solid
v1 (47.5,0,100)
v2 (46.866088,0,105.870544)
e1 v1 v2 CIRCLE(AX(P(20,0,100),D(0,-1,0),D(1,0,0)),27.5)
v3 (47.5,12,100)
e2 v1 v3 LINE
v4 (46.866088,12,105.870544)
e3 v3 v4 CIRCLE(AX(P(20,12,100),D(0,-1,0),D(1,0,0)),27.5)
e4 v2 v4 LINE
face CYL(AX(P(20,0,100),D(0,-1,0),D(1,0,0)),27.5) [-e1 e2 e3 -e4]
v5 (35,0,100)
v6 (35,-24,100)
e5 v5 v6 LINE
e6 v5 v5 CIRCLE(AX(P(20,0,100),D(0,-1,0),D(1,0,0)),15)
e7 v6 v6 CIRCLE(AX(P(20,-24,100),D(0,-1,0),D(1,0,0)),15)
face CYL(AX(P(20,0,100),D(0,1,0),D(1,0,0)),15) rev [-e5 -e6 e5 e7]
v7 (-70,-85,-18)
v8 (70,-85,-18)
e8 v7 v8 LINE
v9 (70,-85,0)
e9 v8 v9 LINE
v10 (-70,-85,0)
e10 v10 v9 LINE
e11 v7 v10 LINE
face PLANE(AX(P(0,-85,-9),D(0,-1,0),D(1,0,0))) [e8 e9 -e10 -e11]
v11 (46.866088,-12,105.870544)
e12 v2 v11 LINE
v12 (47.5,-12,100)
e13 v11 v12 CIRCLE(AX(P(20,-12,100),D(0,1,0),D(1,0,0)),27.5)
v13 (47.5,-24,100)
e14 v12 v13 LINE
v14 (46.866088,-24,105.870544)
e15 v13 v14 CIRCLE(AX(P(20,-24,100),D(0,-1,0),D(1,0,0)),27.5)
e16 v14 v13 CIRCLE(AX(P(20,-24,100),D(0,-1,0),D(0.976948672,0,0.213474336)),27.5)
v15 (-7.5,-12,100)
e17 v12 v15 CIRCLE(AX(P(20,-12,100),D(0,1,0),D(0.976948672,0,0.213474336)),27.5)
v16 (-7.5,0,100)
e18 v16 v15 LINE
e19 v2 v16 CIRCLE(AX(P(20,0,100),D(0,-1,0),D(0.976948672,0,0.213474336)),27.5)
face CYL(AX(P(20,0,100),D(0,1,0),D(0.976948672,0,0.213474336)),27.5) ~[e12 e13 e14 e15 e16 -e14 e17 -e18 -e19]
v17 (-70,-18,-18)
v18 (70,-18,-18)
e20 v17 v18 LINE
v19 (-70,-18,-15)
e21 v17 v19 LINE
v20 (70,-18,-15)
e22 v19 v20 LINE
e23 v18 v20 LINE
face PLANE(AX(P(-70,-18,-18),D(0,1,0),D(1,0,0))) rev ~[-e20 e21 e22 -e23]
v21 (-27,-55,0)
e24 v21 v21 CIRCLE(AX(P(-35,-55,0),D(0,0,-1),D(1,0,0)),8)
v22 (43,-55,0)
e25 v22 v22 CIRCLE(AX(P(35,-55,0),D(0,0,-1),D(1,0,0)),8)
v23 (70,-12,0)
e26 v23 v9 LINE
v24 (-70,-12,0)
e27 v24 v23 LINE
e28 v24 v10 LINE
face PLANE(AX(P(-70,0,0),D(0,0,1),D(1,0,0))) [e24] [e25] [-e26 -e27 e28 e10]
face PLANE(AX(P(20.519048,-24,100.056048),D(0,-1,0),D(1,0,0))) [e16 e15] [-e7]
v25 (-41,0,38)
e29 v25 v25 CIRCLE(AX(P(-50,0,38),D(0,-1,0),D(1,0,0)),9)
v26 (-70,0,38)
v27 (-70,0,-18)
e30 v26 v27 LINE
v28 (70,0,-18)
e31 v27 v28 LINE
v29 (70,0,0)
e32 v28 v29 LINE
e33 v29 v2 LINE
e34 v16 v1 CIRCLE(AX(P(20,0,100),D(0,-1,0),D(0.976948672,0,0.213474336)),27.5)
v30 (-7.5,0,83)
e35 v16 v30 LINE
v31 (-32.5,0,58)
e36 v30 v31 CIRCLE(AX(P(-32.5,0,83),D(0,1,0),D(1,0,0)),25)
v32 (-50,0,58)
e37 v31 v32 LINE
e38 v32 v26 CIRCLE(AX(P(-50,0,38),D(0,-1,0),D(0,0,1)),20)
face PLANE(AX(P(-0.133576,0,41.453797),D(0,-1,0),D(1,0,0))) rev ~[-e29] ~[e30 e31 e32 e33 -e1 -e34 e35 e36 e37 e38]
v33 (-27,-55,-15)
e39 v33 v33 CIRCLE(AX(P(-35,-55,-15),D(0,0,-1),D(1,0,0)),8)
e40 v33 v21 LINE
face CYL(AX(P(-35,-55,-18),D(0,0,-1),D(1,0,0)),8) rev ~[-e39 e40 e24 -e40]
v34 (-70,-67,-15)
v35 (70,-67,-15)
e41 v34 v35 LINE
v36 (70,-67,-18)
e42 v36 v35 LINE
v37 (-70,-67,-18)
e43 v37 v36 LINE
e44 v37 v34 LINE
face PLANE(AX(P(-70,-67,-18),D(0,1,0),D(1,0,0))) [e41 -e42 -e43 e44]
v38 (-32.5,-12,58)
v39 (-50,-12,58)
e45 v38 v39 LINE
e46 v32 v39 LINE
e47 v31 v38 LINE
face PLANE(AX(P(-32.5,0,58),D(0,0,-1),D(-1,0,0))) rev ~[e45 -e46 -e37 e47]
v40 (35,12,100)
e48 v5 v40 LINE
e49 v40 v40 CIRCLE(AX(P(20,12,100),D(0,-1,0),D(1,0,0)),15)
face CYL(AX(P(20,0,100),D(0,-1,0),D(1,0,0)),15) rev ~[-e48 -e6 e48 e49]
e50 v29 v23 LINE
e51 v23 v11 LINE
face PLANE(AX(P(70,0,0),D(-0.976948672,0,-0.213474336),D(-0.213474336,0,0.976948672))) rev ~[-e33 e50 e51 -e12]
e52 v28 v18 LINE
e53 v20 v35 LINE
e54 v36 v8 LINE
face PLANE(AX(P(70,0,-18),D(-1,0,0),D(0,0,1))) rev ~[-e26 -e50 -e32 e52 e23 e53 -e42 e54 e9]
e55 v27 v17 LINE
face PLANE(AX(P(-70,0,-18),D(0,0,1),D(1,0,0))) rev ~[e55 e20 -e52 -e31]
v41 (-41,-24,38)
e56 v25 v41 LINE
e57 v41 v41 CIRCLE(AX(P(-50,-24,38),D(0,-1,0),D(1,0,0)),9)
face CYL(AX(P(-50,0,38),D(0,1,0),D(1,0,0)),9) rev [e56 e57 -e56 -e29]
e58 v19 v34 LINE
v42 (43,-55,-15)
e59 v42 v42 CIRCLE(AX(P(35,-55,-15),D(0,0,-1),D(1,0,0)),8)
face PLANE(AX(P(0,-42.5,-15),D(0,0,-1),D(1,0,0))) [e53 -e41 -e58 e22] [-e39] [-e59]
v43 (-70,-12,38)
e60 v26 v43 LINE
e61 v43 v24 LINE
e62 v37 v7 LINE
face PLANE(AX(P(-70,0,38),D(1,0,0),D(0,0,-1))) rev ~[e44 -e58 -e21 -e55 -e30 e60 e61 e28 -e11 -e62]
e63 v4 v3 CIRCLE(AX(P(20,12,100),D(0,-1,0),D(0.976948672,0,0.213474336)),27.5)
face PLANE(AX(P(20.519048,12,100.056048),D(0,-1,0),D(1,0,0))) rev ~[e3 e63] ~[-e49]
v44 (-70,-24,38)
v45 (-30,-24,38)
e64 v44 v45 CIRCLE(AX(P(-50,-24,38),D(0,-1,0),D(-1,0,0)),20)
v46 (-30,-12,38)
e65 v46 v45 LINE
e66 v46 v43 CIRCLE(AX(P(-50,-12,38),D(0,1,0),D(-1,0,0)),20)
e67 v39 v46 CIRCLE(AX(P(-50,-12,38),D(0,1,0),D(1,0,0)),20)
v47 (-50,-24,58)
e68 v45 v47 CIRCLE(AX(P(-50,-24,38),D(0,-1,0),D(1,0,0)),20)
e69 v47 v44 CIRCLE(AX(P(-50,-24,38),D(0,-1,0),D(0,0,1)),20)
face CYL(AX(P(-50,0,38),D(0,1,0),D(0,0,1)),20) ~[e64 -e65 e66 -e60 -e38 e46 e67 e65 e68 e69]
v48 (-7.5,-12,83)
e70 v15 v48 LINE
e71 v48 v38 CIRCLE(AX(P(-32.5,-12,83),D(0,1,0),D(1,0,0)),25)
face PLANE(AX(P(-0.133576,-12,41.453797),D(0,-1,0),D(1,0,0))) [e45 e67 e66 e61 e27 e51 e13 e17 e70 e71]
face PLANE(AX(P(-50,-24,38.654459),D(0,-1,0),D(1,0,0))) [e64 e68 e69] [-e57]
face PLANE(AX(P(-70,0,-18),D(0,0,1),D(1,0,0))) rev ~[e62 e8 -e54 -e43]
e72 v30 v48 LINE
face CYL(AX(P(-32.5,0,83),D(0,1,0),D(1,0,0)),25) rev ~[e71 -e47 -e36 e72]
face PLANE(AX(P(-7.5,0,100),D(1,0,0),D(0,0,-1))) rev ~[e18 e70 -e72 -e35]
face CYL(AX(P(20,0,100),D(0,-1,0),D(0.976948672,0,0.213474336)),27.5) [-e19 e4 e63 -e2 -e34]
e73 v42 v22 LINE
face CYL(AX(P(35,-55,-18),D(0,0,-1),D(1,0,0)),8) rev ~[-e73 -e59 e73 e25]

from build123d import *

# Parameters (mm, degrees)
F0_W          = 140
F0_H          = 18
F1_DEPTH      = 85
F0_R          = 9
F0_R_2        = 15
F2_DEPTH      = 12
F3_DEPTH      = 24
F4_DEPTH      = 24
F4_DEPTH_BACK = 12
F5_W          = 140
F5_H          = 49
F5_R          = 8
F6_DEPTH      = 3
F7_DEPTH      = 25


# Not quite as in the source:
# - after a boolean that leaves OpenCascade's solid faulty, fix() repairs it


with BuildPart() as f1:
    # F0 (on Front) → F1 (new body)
    with BuildSketch(Plane.XZ):
        with Locations((0, -9)):
            Rectangle(F0_W, F0_H)
    extrude(amount=F1_DEPTH)

    # F0 (on Front) → F2 (join)
    with BuildSketch(Plane.XZ):
        with BuildLine():
            Line((-70, 38), (-70, 0))
            Line((-70, 0), (70, 0))
            Line((70, 0), (46.8660884819, 105.8705442409))
            ThreePointArc((46.8660884819, 105.8705442409), (47.3410628291, 102.9523352409), (47.5, 100))
            ThreePointArc((47.5, 100), (20, 72.5), (-7.5, 100))
            Line((-7.5, 100), (-7.5, 83))
            ThreePointArc((-7.5, 83), (-14.8223304703, 65.3223304703), (-32.5, 58))
            Line((-32.5, 58), (-50, 58))
            ThreePointArc((-50, 58), (-35.8578643763, 52.1421356237), (-30, 38))
            ThreePointArc((-30, 38), (-50, 18), (-70, 38))
        make_face()
        with BuildLine():
            ThreePointArc((-50, 58), (-64.1421356237, 52.1421356237), (-70, 38))
            ThreePointArc((-70, 38), (-50, 18), (-30, 38))
            ThreePointArc((-30, 38), (-35.8578643763, 52.1421356237), (-50, 58))
        make_face()
        with Locations((-50, 38)):
            Circle(F0_R, mode=Mode.SUBTRACT)
        with BuildLine():
            ThreePointArc((47.5, 100), (47.3410628291, 102.9523352409), (46.8660884819, 105.8705442409))
            ThreePointArc((46.8660884819, 105.8705442409), (17.0476647591, 127.3410628291), (-7.5, 100))
            ThreePointArc((-7.5, 100), (20, 72.5), (47.5, 100))
        make_face()
        with Locations((20, 100)):
            Circle(F0_R_2, mode=Mode.SUBTRACT)
    extrude(amount=F2_DEPTH)

    # F0 (on Front) → F3 (join)
    with BuildSketch(Plane.XZ):
        with BuildLine():
            ThreePointArc((-50, 58), (-64.1421356237, 52.1421356237), (-70, 38))
            ThreePointArc((-70, 38), (-50, 18), (-30, 38))
            ThreePointArc((-30, 38), (-35.8578643763, 52.1421356237), (-50, 58))
        make_face()
        with Locations((-50, 38)):
            Circle(F0_R, mode=Mode.SUBTRACT)
    extrude(amount=F3_DEPTH)

    # F0 (on Front) → F4 (join, two sides)
    with BuildSketch(Plane.XZ) as f4_sk:
        with BuildLine():
            ThreePointArc((47.5, 100), (47.3410628291, 102.9523352409), (46.8660884819, 105.8705442409))
            ThreePointArc((46.8660884819, 105.8705442409), (17.0476647591, 127.3410628291), (-7.5, 100))
            ThreePointArc((-7.5, 100), (20, 72.5), (47.5, 100))
        make_face()
        with Locations((20, 100)):
            Circle(F0_R_2, mode=Mode.SUBTRACT)
    extrude(amount=F4_DEPTH)
    extrude(f4_sk.sketch, amount=-F4_DEPTH_BACK)

    add(f1.part.fix(), mode=Mode.REPLACE)

    # F5 (on face) → F6 (cut)
    with BuildSketch(Plane(origin=(0, 0, -18), x_dir=(1, 0, 0), z_dir=(0, 0, -1))):
        with Locations((0, 42.5)):
            Rectangle(F5_W, F5_H)
        with Locations((-35, 55)):
            Circle(F5_R, mode=Mode.SUBTRACT)
        with Locations((35, 55)):
            Circle(F5_R, mode=Mode.SUBTRACT)
    extrude(amount=-F6_DEPTH, mode=Mode.SUBTRACT)

    # F7 (cut): faces of the model
    f7_faces = [f1.faces().sort_by_distance(p)[0] for p in [
        (-35, -55, -18),
        (35, -55, -18),
    ]]
    extrude(f7_faces, amount=-F7_DEPTH, mode=Mode.SUBTRACT)


solid = f1.part
